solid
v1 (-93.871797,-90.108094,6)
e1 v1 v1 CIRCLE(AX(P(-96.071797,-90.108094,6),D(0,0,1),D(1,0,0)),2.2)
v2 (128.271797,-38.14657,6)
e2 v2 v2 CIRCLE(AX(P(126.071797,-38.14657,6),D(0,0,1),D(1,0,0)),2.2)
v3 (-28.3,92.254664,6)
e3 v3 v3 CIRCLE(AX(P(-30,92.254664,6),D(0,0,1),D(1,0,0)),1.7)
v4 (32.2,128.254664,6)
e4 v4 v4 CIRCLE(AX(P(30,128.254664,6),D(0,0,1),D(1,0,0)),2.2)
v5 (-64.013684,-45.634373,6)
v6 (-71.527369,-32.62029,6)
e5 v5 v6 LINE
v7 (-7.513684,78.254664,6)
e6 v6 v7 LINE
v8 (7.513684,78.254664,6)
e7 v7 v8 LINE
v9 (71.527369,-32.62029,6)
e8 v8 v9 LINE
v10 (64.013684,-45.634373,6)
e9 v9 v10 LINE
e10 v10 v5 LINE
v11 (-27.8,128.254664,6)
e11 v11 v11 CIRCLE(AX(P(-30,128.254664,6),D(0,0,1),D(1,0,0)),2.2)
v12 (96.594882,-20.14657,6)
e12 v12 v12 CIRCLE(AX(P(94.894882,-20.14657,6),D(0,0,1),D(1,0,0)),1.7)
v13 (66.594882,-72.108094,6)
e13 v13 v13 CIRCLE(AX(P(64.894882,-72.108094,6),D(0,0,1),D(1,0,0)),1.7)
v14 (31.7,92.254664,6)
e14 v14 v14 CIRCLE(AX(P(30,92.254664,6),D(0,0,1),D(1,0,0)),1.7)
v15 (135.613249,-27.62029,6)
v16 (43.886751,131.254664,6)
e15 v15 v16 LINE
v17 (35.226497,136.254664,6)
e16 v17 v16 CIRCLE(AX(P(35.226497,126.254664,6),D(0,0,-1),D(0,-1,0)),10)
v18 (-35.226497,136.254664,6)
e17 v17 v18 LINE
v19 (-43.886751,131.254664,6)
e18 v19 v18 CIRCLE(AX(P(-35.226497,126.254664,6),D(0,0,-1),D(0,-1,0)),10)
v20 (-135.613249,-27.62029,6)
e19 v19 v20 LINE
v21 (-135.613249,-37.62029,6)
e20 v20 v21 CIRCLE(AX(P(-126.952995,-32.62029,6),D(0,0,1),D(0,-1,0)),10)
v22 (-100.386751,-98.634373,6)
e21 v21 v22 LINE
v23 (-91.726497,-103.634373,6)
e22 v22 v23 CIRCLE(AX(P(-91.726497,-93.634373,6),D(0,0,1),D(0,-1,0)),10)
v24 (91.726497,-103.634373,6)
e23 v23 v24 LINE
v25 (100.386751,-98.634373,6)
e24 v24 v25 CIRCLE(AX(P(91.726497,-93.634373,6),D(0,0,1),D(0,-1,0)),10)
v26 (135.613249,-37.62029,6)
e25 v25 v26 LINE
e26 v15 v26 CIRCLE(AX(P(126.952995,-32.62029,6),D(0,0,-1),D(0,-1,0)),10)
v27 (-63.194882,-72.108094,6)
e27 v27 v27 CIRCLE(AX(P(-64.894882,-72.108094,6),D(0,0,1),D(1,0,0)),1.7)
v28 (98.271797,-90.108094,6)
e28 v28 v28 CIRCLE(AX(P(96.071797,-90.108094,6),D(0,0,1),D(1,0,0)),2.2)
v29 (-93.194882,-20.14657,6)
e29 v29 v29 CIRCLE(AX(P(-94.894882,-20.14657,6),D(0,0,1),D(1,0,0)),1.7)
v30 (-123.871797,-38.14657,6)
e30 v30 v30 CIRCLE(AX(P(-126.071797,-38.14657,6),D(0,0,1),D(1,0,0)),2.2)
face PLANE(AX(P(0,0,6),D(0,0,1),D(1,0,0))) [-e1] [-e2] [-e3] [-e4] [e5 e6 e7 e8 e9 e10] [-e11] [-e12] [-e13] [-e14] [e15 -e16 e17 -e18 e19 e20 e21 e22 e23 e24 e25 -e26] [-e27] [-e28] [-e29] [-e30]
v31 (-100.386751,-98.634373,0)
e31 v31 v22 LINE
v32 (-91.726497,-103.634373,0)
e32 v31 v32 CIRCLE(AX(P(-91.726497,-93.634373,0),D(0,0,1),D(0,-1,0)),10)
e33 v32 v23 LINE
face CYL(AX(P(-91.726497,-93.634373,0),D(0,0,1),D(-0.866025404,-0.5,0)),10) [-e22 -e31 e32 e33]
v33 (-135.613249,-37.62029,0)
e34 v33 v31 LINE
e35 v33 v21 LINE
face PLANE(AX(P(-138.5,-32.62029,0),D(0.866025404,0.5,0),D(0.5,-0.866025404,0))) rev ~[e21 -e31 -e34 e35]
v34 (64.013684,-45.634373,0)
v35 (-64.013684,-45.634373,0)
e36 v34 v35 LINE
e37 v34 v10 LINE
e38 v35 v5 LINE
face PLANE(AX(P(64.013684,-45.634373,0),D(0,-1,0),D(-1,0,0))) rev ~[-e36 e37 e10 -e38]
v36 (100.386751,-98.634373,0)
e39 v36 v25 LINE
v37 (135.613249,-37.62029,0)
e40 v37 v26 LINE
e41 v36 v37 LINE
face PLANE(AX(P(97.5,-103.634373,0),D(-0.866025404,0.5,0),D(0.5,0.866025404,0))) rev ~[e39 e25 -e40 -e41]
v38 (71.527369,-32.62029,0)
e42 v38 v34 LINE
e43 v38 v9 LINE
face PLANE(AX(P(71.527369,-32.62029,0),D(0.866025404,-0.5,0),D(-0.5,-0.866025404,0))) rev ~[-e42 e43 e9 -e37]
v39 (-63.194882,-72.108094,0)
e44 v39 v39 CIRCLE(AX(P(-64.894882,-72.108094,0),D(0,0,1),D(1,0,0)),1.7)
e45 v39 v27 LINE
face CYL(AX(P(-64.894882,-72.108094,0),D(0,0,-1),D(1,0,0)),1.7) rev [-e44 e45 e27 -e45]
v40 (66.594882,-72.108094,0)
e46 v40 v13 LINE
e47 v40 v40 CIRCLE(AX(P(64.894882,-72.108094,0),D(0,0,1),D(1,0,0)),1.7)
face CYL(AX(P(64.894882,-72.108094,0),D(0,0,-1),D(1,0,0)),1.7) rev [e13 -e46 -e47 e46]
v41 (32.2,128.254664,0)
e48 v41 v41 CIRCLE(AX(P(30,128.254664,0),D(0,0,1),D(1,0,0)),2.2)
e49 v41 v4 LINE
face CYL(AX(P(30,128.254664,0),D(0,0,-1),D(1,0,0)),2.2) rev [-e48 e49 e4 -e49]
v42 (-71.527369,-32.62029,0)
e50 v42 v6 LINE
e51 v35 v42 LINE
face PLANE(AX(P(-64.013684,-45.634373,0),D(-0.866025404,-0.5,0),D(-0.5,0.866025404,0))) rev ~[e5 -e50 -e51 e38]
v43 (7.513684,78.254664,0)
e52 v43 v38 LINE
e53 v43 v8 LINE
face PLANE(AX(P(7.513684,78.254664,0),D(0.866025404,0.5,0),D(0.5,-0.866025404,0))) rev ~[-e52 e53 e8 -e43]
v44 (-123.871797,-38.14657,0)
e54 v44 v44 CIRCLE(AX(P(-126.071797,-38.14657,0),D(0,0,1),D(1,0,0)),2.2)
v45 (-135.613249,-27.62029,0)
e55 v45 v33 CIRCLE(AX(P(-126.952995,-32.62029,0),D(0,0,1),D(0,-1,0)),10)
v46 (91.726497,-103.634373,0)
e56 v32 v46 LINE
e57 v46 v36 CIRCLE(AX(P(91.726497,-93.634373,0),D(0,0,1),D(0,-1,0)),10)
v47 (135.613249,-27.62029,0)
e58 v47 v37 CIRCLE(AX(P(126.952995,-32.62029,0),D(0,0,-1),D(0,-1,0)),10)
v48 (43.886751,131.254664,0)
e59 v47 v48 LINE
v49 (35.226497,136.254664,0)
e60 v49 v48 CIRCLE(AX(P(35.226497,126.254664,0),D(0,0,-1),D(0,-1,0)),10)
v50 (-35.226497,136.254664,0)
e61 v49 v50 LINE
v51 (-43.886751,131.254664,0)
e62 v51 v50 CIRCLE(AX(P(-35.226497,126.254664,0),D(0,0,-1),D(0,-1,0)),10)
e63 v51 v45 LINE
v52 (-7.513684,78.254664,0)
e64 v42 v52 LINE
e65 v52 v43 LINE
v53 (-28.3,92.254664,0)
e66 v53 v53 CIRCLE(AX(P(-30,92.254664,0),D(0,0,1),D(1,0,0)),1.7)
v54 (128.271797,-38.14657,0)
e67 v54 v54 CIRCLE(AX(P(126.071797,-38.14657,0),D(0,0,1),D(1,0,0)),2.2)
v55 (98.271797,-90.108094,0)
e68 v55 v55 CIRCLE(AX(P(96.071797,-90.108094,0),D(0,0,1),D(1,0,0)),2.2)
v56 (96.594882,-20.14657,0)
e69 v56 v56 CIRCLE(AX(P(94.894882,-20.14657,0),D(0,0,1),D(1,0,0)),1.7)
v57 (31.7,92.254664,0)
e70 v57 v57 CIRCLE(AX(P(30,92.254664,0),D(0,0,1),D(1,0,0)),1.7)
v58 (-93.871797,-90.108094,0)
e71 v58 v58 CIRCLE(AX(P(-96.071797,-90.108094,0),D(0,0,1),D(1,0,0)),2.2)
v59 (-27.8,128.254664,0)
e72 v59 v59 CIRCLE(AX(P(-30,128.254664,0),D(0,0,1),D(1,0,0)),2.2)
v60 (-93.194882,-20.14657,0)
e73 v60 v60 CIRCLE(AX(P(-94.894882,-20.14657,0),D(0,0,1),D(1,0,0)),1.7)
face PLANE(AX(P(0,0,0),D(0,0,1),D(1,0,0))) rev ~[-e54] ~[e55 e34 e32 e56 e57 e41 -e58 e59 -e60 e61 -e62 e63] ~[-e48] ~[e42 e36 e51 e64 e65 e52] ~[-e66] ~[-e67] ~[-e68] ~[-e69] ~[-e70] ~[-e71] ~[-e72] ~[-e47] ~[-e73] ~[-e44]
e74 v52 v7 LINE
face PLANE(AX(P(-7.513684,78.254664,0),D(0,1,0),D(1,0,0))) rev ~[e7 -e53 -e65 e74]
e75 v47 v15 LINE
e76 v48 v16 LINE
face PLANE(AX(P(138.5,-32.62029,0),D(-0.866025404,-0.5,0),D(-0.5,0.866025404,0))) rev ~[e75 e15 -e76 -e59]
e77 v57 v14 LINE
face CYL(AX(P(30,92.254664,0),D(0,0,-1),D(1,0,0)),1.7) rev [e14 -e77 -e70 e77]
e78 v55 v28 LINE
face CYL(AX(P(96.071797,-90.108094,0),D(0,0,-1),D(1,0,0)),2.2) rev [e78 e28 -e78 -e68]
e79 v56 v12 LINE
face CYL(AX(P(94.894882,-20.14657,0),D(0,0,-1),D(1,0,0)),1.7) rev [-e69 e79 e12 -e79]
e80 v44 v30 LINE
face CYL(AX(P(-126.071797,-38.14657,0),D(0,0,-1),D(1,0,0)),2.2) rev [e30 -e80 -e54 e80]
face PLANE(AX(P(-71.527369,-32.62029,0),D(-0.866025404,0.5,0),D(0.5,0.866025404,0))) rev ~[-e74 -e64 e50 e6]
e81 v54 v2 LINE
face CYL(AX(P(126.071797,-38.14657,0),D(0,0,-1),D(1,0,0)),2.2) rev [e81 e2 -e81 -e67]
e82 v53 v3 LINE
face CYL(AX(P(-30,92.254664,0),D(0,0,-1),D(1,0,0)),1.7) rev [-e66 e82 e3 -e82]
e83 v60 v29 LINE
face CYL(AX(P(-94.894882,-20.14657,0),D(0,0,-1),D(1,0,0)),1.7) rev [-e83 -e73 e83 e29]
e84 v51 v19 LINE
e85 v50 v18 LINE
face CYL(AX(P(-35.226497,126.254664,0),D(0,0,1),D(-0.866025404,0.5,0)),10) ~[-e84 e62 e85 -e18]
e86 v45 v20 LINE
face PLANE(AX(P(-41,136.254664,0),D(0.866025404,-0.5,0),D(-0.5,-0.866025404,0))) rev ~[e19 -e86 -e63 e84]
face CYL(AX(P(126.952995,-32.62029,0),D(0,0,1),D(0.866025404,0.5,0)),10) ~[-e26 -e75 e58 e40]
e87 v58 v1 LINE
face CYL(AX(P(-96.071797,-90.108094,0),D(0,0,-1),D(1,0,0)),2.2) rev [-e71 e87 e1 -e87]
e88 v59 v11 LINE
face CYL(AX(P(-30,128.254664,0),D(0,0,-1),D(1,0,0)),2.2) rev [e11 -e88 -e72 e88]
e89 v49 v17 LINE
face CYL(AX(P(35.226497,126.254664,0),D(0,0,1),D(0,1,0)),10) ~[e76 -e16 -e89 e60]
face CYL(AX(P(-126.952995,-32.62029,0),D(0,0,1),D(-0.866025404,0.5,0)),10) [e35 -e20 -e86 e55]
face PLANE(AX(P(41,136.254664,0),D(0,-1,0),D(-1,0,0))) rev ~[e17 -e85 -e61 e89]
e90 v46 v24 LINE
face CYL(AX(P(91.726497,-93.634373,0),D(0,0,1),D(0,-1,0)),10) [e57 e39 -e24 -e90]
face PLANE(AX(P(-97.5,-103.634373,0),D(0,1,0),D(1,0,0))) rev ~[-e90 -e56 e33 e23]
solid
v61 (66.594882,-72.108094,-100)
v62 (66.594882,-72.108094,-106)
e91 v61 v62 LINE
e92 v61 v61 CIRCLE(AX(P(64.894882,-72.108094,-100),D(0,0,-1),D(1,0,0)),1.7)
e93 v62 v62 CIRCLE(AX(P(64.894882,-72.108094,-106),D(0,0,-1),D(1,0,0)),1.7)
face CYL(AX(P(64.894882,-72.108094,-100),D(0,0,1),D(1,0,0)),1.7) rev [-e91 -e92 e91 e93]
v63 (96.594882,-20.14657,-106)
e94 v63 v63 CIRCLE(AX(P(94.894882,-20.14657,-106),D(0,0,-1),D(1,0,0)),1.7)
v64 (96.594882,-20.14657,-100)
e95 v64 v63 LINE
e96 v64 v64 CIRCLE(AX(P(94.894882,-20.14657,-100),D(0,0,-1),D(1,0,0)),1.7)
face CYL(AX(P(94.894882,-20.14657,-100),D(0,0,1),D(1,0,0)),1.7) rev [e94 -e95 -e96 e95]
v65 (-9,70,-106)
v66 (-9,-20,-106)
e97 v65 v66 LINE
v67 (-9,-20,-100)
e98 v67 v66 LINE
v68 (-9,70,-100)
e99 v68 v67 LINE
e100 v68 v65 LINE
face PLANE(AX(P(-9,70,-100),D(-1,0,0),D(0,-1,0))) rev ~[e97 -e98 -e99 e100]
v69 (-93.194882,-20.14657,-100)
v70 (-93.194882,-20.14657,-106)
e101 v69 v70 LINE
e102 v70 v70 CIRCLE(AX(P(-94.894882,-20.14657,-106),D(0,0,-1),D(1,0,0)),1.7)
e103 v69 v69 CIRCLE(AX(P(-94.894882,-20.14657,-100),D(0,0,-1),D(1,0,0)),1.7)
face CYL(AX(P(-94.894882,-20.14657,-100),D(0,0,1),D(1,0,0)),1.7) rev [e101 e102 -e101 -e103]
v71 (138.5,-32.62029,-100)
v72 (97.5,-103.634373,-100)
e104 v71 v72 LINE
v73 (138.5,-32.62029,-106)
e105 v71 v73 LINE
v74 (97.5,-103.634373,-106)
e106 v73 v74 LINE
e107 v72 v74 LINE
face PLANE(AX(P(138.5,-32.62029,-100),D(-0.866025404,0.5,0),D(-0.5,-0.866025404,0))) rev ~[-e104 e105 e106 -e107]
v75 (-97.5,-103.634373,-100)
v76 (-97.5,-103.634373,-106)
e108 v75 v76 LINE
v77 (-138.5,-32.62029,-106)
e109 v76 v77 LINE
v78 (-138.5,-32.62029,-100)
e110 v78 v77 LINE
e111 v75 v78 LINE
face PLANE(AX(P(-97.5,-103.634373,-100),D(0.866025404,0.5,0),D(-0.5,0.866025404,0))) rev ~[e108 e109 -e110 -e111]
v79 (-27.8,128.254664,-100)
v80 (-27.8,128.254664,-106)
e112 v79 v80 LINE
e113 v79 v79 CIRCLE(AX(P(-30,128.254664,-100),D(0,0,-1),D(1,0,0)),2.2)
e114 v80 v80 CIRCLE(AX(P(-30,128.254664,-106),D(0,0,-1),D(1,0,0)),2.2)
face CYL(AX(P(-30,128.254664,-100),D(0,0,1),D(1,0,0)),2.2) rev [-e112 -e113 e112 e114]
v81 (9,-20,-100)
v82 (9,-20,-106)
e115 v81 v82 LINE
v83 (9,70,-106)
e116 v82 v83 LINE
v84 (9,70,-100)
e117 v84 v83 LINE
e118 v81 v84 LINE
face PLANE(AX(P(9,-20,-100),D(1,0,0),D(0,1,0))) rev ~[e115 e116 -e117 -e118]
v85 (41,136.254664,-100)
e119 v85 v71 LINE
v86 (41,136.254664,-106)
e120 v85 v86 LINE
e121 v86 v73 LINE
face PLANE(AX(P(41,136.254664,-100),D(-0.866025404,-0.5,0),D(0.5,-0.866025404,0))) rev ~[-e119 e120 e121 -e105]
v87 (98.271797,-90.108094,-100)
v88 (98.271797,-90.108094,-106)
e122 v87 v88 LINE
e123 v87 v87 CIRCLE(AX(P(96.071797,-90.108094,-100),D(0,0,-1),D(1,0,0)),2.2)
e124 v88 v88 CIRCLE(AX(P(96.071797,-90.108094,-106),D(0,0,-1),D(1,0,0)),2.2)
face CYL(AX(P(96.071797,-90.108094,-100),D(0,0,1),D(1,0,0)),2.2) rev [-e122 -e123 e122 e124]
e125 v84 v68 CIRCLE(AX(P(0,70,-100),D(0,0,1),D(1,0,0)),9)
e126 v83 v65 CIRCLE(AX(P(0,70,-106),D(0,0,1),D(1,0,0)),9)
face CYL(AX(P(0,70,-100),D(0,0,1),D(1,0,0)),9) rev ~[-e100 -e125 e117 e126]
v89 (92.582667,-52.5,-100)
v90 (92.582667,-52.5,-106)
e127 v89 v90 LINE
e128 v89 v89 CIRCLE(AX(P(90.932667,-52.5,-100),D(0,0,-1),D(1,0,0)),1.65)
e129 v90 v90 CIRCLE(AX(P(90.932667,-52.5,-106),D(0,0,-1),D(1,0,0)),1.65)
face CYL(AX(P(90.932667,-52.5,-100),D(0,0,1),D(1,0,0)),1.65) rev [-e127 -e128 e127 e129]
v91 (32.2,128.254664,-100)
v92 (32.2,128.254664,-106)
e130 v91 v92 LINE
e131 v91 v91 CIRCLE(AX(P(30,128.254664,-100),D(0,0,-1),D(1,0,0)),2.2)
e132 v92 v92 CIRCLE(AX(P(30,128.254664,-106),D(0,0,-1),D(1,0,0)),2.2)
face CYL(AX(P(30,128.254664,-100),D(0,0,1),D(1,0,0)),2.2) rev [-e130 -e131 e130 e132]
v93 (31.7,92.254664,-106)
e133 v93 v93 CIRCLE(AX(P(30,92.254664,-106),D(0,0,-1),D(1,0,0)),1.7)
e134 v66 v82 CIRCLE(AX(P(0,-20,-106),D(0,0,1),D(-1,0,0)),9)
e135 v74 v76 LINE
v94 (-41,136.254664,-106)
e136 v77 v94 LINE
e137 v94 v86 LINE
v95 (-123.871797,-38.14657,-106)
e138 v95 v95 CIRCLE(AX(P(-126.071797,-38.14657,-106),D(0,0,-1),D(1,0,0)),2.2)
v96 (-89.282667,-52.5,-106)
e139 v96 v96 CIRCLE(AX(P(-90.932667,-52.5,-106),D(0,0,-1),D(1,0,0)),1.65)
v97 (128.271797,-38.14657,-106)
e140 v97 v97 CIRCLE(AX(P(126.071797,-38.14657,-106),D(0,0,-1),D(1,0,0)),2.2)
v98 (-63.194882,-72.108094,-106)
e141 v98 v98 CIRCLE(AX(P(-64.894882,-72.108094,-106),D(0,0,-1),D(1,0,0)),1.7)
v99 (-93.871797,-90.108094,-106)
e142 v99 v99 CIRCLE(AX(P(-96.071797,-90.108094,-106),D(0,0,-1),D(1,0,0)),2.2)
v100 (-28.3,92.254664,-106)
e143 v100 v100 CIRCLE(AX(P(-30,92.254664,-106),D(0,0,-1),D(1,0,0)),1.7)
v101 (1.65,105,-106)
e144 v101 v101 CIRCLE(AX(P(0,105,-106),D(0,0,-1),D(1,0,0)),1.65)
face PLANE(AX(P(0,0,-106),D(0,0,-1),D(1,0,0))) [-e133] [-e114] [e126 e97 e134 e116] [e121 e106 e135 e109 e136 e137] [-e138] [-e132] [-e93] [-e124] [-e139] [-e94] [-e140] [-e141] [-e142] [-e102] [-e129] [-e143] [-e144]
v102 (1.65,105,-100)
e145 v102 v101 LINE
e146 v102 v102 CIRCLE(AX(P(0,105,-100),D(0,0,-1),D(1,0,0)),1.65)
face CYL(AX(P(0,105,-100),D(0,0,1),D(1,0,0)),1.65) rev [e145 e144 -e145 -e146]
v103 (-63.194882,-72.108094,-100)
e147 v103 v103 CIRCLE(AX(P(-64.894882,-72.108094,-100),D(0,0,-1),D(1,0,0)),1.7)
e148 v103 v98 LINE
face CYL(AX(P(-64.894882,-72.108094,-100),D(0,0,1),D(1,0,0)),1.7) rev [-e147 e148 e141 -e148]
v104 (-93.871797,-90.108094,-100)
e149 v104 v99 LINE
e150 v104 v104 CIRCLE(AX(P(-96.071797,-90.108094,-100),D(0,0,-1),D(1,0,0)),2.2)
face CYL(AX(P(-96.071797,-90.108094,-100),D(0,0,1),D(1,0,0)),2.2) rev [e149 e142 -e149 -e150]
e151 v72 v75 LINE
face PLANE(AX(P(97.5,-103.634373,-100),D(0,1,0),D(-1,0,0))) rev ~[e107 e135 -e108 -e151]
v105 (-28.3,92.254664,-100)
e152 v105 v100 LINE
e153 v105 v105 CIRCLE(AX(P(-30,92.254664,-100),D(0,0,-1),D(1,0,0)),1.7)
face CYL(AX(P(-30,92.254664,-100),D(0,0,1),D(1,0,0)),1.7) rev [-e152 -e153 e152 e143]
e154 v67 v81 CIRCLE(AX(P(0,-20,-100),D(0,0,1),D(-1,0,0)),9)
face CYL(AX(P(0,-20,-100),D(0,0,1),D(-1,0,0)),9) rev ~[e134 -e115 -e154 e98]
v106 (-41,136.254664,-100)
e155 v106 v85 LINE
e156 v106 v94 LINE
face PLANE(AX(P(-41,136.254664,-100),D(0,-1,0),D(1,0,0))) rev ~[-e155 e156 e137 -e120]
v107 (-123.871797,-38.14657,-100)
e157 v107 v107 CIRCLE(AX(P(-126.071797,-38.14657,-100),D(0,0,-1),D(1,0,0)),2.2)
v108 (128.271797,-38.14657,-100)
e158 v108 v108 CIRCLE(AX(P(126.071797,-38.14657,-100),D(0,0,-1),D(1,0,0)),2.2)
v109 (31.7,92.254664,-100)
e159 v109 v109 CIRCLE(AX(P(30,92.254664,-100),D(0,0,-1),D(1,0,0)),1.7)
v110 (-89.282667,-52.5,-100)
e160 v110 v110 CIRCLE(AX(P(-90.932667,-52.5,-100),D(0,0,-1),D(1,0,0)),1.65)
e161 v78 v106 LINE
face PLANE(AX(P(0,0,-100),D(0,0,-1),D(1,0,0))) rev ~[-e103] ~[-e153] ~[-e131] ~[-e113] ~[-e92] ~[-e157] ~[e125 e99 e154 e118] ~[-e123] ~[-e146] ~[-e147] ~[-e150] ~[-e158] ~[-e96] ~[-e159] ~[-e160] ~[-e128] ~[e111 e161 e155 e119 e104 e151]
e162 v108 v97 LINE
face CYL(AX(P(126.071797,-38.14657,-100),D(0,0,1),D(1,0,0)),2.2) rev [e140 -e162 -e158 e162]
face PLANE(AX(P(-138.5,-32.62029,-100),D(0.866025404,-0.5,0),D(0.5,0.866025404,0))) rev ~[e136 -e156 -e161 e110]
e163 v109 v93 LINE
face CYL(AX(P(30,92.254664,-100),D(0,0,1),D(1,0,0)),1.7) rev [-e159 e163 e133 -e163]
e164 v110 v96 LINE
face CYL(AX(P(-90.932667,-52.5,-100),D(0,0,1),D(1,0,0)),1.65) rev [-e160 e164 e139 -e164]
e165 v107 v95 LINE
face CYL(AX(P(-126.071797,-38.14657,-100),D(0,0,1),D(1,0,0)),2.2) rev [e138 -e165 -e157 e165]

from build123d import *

# Parameters (mm, degrees)
F0_R     = 2.2
F0_R_2   = 1.7
F1_DEPTH = 6
F3_R     = 2.2
F3_R_2   = 1.7
F3_R_3   = 1.65
F4_DEPTH = 6
F5_R     = 10


# Not quite as in the source:
# - a feature names something its author has since deleted; it is built from what else it names


with BuildPart() as f1:
    # F0 (on Top) → F1 (new body)
    with BuildSketch(Plane.XY):
        Polygon((-41, 136.2546635288), (-138.5, -32.6202902092), (-97.5, -103.6343733195), (97.5, -103.6343733195), (138.5, -32.6202902092), (41, 136.2546635288), align=None)
        with Locations((-96.0717967697, -90.1080938779)):
            Circle(F0_R, mode=Mode.SUBTRACT)
        with Locations((-64.8948822335, -72.1080938779)):
            Circle(F0_R_2, mode=Mode.SUBTRACT)
        with Locations((-126.0717967697, -38.1465696508)):
            Circle(F0_R, mode=Mode.SUBTRACT)
        with Locations((-94.8948822335, -20.1465696508)):
            Circle(F0_R_2, mode=Mode.SUBTRACT)
        with Locations((64.8948822335, -72.1080938779)):
            Circle(F0_R_2, mode=Mode.SUBTRACT)
        with Locations((96.0717967697, -90.1080938779)):
            Circle(F0_R, mode=Mode.SUBTRACT)
        with Locations((94.8948822335, -20.1465696508)):
            Circle(F0_R_2, mode=Mode.SUBTRACT)
        with Locations((126.0717967697, -38.1465696508)):
            Circle(F0_R, mode=Mode.SUBTRACT)
        with Locations((-30, 92.2546635288)):
            Circle(F0_R_2, mode=Mode.SUBTRACT)
        with Locations((-30, 128.2546635288)):
            Circle(F0_R, mode=Mode.SUBTRACT)
        Polygon((71.527368774, -32.6202902092), (64.013684387, -45.6343733195), (-64.013684387, -45.6343733195), (-71.527368774, -32.6202902092), (-7.513684387, 78.2546635288), (7.513684387, 78.2546635288), align=None, mode=Mode.SUBTRACT)
        with Locations((30, 92.2546635288)):
            Circle(F0_R_2, mode=Mode.SUBTRACT)
        with Locations((30, 128.2546635288)):
            Circle(F0_R, mode=Mode.SUBTRACT)
    extrude(amount=F1_DEPTH)

    # F5
    f5_edges = [f1.edges().sort_by_distance(p)[0] for p in [
        (97.5, -103.634373, 3),
        (138.5, -32.62029, 3),
        (-97.5, -103.634373, 3),
        (-138.5, -32.62029, 3),
        (-41, 136.254664, 3),
        (41, 136.254664, 3),
    ]]
    fillet(f5_edges, radius=F5_R)


with BuildPart() as f4:
    # F3 (on offset) → F4 (new body)
    with BuildSketch(Plane(origin=(0, 0, -100), x_dir=(1, 0, 0), z_dir=(0, 0, -1))):
        Polygon((97.5, 103.6343733195), (-97.5, 103.6343733195), (-138.5, 32.6202902092), (-41, -136.2546635288), (41, -136.2546635288), (138.5, 32.6202902092), align=None)
        with Locations((-30, -128.2546635288)):
            Circle(F3_R, mode=Mode.SUBTRACT)
        with Locations((-30, -92.2546635288)):
            Circle(F3_R_2, mode=Mode.SUBTRACT)
        with Locations((30, -128.2546635288)):
            Circle(F3_R, mode=Mode.SUBTRACT)
        with Locations((0, -105)):
            Circle(F3_R_3, mode=Mode.SUBTRACT)
        with Locations((30, -92.2546635288)):
            Circle(F3_R_2, mode=Mode.SUBTRACT)
        with BuildLine():
            Line((-9, -70), (-9, 20))
            ThreePointArc((-9, 20), (0, 29), (9, 20))
            Line((9, 20), (9, -70))
            ThreePointArc((9, -70), (0, -79), (-9, -70))
        make_face(mode=Mode.SUBTRACT)
        with Locations((-126.0717967697, 38.1465696508)):
            Circle(F3_R, mode=Mode.SUBTRACT)
        with Locations((-94.8948822335, 20.1465696508)):
            Circle(F3_R_2, mode=Mode.SUBTRACT)
        with Locations((-90.9326673974, 52.5)):
            Circle(F3_R_3, mode=Mode.SUBTRACT)
        with Locations((-96.0717967697, 90.1080938779)):
            Circle(F3_R, mode=Mode.SUBTRACT)
        with Locations((-64.8948822335, 72.1080938779)):
            Circle(F3_R_2, mode=Mode.SUBTRACT)
        with Locations((94.8948822335, 20.1465696508)):
            Circle(F3_R_2, mode=Mode.SUBTRACT)
        with Locations((126.0717967697, 38.1465696508)):
            Circle(F3_R, mode=Mode.SUBTRACT)
        with Locations((64.8948822335, 72.1080938779)):
            Circle(F3_R_2, mode=Mode.SUBTRACT)
        with Locations((90.9326673974, 52.5)):
            Circle(F3_R_3, mode=Mode.SUBTRACT)
        with Locations((96.0717967697, 90.1080938779)):
            Circle(F3_R, mode=Mode.SUBTRACT)
    extrude(amount=F4_DEPTH)


solid = Compound([f1.part, f4.part])
